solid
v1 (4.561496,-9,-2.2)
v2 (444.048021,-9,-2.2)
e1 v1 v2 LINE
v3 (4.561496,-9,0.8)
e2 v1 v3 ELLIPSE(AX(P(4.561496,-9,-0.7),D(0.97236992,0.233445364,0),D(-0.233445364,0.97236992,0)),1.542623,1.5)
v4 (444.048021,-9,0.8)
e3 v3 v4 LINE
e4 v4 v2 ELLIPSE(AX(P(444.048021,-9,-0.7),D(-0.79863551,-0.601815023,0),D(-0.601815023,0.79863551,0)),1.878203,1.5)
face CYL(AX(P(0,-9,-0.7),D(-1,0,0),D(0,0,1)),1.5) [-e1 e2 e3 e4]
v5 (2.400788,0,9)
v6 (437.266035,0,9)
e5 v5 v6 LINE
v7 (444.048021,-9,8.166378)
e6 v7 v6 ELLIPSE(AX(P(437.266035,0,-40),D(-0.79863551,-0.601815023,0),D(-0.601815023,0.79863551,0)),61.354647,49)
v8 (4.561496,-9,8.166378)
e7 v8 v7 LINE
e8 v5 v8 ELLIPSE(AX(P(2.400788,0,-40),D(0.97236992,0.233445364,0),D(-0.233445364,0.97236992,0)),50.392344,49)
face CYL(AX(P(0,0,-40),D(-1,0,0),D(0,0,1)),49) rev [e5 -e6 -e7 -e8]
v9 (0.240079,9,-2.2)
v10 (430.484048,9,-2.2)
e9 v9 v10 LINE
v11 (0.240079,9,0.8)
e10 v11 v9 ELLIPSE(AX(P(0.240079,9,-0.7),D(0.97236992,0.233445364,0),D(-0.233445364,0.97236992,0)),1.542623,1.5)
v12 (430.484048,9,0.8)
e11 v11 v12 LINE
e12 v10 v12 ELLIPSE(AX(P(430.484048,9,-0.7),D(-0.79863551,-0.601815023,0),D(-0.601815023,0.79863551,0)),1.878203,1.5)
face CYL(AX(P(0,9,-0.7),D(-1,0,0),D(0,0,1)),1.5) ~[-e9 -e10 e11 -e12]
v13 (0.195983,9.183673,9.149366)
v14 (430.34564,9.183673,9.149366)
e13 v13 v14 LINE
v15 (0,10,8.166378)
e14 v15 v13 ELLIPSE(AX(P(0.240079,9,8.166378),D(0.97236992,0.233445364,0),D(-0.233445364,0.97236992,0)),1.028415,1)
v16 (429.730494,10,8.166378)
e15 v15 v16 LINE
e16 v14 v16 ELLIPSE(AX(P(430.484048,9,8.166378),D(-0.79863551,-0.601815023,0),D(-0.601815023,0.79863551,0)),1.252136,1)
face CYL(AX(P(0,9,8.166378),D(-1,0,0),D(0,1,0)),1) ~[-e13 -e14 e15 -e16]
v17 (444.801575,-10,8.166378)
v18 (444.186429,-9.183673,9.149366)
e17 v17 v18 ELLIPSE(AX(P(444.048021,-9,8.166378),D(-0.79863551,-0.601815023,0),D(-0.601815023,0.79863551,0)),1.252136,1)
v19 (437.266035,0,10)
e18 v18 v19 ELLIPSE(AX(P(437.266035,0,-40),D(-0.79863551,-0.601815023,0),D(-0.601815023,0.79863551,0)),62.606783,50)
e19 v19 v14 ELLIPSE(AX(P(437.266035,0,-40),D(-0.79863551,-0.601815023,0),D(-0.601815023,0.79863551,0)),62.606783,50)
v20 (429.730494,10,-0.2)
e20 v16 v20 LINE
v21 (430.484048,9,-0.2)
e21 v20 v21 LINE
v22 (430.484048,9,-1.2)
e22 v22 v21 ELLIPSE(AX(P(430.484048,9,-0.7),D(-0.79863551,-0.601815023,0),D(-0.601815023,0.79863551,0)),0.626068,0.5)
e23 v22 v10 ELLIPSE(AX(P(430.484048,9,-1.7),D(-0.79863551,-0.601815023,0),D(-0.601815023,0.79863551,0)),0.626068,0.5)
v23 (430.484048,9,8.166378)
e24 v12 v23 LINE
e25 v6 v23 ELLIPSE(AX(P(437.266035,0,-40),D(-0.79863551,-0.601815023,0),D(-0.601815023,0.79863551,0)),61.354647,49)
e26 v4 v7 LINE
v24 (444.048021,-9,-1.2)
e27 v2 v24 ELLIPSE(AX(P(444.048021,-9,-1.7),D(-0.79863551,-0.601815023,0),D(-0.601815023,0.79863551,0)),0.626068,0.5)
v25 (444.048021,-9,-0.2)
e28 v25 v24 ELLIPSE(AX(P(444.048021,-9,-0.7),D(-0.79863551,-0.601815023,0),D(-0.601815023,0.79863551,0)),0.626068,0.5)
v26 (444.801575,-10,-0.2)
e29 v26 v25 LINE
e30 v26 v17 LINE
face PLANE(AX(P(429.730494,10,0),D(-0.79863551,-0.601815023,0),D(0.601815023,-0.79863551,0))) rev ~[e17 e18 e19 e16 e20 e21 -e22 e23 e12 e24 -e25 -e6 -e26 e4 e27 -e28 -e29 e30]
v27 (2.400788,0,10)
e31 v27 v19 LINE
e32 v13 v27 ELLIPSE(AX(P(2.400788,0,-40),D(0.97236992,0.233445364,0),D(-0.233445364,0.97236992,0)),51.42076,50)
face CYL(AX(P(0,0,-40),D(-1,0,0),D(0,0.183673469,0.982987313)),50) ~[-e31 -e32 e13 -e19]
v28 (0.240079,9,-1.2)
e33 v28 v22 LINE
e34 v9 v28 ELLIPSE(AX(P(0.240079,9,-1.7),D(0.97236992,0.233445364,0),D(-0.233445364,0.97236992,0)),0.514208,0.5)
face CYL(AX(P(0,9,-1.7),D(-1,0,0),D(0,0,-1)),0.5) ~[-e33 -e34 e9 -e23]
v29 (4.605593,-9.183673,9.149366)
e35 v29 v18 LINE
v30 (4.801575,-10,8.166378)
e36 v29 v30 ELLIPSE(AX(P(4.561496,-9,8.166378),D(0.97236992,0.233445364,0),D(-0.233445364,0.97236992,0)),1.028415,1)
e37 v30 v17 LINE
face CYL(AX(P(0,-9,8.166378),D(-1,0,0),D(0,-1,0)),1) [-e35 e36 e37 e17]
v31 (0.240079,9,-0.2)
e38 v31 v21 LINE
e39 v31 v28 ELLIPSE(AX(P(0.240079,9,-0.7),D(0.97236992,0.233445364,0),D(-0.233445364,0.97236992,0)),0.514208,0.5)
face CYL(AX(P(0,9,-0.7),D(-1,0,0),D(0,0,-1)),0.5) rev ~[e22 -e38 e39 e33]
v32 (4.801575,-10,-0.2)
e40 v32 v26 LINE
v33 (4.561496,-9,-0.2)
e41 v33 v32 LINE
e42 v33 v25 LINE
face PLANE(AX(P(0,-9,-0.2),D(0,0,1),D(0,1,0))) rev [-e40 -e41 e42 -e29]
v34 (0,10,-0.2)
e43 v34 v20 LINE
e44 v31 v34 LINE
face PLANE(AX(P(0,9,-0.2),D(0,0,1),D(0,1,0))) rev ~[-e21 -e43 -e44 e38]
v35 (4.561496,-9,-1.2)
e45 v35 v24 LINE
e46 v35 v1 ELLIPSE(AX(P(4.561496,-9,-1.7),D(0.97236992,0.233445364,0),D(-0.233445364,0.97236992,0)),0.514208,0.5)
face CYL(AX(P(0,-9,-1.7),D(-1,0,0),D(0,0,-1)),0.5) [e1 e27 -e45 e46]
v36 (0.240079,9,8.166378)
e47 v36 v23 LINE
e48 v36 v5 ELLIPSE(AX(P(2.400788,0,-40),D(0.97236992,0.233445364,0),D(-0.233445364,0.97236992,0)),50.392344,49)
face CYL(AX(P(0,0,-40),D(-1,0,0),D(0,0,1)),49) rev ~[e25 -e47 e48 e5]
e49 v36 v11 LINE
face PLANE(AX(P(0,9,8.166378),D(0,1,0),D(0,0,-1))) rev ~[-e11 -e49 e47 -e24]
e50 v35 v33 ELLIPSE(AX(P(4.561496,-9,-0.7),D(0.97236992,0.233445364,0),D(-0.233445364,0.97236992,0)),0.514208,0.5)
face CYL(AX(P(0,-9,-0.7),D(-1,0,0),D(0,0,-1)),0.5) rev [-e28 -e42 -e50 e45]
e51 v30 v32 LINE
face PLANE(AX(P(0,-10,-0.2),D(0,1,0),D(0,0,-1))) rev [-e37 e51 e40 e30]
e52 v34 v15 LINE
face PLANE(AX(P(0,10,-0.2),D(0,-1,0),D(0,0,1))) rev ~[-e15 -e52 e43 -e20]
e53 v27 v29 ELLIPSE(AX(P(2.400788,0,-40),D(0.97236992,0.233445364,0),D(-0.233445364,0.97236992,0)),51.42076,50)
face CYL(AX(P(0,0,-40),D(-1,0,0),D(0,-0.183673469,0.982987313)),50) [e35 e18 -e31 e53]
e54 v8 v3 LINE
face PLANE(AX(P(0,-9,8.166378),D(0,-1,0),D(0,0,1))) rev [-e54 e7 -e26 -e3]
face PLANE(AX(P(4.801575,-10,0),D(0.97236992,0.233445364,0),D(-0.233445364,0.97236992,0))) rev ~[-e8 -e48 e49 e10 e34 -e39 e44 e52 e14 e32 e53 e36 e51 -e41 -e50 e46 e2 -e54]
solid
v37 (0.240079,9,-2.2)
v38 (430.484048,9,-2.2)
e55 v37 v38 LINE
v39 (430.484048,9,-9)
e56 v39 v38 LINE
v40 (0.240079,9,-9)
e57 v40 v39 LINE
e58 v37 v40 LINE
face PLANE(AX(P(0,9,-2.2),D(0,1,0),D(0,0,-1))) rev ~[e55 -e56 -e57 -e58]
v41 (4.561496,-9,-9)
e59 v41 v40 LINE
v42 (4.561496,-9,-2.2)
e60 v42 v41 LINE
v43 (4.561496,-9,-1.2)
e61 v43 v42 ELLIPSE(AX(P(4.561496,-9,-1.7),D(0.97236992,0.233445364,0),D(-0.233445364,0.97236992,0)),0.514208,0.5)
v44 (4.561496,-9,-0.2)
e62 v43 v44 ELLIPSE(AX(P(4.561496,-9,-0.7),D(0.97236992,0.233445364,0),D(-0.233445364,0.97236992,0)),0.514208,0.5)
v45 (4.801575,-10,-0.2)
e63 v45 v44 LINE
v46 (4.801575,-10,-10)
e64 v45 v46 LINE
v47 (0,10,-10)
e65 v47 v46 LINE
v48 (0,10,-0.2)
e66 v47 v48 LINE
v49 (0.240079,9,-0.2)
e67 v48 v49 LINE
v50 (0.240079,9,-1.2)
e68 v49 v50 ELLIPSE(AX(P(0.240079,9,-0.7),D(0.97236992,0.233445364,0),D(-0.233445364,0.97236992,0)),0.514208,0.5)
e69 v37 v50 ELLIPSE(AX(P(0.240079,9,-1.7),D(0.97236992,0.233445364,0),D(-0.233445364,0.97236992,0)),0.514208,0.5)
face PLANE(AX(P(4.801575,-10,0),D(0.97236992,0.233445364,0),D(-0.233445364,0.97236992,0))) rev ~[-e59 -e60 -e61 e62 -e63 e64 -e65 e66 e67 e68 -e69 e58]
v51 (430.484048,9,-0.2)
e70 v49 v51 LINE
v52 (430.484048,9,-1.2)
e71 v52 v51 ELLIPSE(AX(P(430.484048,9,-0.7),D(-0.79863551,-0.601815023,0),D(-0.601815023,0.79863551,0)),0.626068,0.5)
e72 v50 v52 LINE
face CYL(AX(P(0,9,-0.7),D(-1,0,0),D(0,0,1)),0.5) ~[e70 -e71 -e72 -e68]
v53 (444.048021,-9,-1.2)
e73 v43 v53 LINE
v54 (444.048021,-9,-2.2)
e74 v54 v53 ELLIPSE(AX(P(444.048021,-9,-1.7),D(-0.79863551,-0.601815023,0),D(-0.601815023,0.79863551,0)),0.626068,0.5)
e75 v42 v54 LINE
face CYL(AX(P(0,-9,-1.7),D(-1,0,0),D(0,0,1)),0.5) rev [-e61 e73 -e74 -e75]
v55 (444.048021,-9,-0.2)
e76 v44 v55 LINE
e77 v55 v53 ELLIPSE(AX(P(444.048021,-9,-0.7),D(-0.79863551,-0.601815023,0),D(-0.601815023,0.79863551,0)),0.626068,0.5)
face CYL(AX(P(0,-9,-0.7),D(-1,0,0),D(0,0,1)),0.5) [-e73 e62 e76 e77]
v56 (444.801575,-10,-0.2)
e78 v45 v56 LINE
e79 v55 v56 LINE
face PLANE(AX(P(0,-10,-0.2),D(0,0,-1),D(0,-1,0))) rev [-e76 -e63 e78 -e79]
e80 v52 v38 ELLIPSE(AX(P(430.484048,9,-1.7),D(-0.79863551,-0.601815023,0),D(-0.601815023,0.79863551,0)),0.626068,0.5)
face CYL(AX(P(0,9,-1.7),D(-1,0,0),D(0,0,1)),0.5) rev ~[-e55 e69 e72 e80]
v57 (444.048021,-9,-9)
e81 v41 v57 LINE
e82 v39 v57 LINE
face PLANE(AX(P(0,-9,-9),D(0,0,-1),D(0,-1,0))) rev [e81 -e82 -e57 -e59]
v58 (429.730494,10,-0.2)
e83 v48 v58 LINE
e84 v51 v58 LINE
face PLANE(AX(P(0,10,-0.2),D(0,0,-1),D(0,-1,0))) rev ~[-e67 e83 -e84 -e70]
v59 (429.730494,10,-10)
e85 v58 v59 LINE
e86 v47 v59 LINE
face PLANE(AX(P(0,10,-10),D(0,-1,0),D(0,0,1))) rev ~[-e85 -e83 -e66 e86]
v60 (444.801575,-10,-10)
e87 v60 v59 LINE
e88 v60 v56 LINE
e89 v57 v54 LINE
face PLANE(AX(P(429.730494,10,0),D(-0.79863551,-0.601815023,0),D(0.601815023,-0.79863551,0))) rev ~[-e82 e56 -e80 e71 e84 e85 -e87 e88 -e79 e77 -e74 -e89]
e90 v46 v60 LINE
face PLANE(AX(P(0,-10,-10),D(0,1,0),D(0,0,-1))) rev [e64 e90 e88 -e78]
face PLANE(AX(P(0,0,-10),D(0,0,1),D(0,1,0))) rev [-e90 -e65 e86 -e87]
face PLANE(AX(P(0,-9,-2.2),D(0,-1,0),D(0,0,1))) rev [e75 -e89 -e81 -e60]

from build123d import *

# Parameters (mm, degrees)
F2_DEPTH      = 1000
F4_DEPTH      = 1000
F8_DEPTH      = 10.001
F8_DEPTH_BACK = 10.001


with BuildPart() as f2:
    # F1 (on Right) → F2 (new body)
    with BuildSketch(Plane.YZ):
        with BuildLine():
            Line((0, -9), (0, -10))
            Line((0, -10), (10, -10))
            Line((10, -10), (10, -0.2))
            Line((10, -0.2), (9, -0.2))
            ThreePointArc((9, -0.2), (8.5, -0.7), (9, -1.2))
            ThreePointArc((9, -1.2), (9.5, -1.7), (9, -2.2))
            Line((9, -2.2), (9, -9))
            Line((9, -9), (0, -9))
        make_face()
    extrude(amount=F2_DEPTH)

    # F5: F2 across plane


with BuildPart() as f4:
    # F3 (on Right) → F4 (new body)
    with BuildSketch(Plane.YZ):
        with BuildLine():
            Line((9, -0.2), (10, -0.2))
            Line((10, -0.2), (10, 8.1663783152))
            ThreePointArc((10, 8.1663783152), (9.7693092582, 8.8052548802), (9.1836734694, 9.1493656277))
            ThreePointArc((9.1836734694, 9.1493656277), (4.6114920912, 9.7868872364), (0, 10))
            Line((0, 10), (0, 9))
            ThreePointArc((0, 9), (4.5192622493, 8.7911494917), (9, 8.1663783152))
            Line((9, 8.1663783152), (9, 0.8))
            ThreePointArc((9, 0.8), (7.5, -0.7), (9, -2.2))
            ThreePointArc((9, -2.2), (9.5, -1.7), (9, -1.2))
            ThreePointArc((9, -1.2), (8.5, -0.7), (9, -0.2))
        make_face()
    extrude(amount=F4_DEPTH)

    # F6: F4 across plane


with BuildPart() as f2_1:
    add(f2.part)
    add(f2.part.mirror(Plane.XZ))


with BuildPart() as f4_1:
    add(f4.part)
    add(f4.part.mirror(Plane.XZ))


with BuildPart() as f8_tool:
    # F7 (on Top) → F8 (new body, two sides)
    with BuildSketch(Plane.XY) as f8_sk:
        Polygon((0, 10), (0, 0), (0, -10), (4.8015751816, -10), align=None)
        Polygon((444.8015751816, 10), (429.7304941795, 10), (444.8015751816, -10), (1016.9613361359, -10), (1016.9613361359, 10), align=None)
    extrude(amount=F8_DEPTH)
    extrude(f8_sk.sketch, amount=-F8_DEPTH_BACK)


with BuildPart() as f2_2:
    add(f2_1.part)

    # F8: cut by f8_tool
    add(f8_tool.part, mode=Mode.SUBTRACT)


with BuildPart() as f4_2:
    add(f4_1.part)

    # F8: cut by f8_tool
    add(f8_tool.part, mode=Mode.SUBTRACT)


solid = Compound([f2_2.part, f4_2.part])
